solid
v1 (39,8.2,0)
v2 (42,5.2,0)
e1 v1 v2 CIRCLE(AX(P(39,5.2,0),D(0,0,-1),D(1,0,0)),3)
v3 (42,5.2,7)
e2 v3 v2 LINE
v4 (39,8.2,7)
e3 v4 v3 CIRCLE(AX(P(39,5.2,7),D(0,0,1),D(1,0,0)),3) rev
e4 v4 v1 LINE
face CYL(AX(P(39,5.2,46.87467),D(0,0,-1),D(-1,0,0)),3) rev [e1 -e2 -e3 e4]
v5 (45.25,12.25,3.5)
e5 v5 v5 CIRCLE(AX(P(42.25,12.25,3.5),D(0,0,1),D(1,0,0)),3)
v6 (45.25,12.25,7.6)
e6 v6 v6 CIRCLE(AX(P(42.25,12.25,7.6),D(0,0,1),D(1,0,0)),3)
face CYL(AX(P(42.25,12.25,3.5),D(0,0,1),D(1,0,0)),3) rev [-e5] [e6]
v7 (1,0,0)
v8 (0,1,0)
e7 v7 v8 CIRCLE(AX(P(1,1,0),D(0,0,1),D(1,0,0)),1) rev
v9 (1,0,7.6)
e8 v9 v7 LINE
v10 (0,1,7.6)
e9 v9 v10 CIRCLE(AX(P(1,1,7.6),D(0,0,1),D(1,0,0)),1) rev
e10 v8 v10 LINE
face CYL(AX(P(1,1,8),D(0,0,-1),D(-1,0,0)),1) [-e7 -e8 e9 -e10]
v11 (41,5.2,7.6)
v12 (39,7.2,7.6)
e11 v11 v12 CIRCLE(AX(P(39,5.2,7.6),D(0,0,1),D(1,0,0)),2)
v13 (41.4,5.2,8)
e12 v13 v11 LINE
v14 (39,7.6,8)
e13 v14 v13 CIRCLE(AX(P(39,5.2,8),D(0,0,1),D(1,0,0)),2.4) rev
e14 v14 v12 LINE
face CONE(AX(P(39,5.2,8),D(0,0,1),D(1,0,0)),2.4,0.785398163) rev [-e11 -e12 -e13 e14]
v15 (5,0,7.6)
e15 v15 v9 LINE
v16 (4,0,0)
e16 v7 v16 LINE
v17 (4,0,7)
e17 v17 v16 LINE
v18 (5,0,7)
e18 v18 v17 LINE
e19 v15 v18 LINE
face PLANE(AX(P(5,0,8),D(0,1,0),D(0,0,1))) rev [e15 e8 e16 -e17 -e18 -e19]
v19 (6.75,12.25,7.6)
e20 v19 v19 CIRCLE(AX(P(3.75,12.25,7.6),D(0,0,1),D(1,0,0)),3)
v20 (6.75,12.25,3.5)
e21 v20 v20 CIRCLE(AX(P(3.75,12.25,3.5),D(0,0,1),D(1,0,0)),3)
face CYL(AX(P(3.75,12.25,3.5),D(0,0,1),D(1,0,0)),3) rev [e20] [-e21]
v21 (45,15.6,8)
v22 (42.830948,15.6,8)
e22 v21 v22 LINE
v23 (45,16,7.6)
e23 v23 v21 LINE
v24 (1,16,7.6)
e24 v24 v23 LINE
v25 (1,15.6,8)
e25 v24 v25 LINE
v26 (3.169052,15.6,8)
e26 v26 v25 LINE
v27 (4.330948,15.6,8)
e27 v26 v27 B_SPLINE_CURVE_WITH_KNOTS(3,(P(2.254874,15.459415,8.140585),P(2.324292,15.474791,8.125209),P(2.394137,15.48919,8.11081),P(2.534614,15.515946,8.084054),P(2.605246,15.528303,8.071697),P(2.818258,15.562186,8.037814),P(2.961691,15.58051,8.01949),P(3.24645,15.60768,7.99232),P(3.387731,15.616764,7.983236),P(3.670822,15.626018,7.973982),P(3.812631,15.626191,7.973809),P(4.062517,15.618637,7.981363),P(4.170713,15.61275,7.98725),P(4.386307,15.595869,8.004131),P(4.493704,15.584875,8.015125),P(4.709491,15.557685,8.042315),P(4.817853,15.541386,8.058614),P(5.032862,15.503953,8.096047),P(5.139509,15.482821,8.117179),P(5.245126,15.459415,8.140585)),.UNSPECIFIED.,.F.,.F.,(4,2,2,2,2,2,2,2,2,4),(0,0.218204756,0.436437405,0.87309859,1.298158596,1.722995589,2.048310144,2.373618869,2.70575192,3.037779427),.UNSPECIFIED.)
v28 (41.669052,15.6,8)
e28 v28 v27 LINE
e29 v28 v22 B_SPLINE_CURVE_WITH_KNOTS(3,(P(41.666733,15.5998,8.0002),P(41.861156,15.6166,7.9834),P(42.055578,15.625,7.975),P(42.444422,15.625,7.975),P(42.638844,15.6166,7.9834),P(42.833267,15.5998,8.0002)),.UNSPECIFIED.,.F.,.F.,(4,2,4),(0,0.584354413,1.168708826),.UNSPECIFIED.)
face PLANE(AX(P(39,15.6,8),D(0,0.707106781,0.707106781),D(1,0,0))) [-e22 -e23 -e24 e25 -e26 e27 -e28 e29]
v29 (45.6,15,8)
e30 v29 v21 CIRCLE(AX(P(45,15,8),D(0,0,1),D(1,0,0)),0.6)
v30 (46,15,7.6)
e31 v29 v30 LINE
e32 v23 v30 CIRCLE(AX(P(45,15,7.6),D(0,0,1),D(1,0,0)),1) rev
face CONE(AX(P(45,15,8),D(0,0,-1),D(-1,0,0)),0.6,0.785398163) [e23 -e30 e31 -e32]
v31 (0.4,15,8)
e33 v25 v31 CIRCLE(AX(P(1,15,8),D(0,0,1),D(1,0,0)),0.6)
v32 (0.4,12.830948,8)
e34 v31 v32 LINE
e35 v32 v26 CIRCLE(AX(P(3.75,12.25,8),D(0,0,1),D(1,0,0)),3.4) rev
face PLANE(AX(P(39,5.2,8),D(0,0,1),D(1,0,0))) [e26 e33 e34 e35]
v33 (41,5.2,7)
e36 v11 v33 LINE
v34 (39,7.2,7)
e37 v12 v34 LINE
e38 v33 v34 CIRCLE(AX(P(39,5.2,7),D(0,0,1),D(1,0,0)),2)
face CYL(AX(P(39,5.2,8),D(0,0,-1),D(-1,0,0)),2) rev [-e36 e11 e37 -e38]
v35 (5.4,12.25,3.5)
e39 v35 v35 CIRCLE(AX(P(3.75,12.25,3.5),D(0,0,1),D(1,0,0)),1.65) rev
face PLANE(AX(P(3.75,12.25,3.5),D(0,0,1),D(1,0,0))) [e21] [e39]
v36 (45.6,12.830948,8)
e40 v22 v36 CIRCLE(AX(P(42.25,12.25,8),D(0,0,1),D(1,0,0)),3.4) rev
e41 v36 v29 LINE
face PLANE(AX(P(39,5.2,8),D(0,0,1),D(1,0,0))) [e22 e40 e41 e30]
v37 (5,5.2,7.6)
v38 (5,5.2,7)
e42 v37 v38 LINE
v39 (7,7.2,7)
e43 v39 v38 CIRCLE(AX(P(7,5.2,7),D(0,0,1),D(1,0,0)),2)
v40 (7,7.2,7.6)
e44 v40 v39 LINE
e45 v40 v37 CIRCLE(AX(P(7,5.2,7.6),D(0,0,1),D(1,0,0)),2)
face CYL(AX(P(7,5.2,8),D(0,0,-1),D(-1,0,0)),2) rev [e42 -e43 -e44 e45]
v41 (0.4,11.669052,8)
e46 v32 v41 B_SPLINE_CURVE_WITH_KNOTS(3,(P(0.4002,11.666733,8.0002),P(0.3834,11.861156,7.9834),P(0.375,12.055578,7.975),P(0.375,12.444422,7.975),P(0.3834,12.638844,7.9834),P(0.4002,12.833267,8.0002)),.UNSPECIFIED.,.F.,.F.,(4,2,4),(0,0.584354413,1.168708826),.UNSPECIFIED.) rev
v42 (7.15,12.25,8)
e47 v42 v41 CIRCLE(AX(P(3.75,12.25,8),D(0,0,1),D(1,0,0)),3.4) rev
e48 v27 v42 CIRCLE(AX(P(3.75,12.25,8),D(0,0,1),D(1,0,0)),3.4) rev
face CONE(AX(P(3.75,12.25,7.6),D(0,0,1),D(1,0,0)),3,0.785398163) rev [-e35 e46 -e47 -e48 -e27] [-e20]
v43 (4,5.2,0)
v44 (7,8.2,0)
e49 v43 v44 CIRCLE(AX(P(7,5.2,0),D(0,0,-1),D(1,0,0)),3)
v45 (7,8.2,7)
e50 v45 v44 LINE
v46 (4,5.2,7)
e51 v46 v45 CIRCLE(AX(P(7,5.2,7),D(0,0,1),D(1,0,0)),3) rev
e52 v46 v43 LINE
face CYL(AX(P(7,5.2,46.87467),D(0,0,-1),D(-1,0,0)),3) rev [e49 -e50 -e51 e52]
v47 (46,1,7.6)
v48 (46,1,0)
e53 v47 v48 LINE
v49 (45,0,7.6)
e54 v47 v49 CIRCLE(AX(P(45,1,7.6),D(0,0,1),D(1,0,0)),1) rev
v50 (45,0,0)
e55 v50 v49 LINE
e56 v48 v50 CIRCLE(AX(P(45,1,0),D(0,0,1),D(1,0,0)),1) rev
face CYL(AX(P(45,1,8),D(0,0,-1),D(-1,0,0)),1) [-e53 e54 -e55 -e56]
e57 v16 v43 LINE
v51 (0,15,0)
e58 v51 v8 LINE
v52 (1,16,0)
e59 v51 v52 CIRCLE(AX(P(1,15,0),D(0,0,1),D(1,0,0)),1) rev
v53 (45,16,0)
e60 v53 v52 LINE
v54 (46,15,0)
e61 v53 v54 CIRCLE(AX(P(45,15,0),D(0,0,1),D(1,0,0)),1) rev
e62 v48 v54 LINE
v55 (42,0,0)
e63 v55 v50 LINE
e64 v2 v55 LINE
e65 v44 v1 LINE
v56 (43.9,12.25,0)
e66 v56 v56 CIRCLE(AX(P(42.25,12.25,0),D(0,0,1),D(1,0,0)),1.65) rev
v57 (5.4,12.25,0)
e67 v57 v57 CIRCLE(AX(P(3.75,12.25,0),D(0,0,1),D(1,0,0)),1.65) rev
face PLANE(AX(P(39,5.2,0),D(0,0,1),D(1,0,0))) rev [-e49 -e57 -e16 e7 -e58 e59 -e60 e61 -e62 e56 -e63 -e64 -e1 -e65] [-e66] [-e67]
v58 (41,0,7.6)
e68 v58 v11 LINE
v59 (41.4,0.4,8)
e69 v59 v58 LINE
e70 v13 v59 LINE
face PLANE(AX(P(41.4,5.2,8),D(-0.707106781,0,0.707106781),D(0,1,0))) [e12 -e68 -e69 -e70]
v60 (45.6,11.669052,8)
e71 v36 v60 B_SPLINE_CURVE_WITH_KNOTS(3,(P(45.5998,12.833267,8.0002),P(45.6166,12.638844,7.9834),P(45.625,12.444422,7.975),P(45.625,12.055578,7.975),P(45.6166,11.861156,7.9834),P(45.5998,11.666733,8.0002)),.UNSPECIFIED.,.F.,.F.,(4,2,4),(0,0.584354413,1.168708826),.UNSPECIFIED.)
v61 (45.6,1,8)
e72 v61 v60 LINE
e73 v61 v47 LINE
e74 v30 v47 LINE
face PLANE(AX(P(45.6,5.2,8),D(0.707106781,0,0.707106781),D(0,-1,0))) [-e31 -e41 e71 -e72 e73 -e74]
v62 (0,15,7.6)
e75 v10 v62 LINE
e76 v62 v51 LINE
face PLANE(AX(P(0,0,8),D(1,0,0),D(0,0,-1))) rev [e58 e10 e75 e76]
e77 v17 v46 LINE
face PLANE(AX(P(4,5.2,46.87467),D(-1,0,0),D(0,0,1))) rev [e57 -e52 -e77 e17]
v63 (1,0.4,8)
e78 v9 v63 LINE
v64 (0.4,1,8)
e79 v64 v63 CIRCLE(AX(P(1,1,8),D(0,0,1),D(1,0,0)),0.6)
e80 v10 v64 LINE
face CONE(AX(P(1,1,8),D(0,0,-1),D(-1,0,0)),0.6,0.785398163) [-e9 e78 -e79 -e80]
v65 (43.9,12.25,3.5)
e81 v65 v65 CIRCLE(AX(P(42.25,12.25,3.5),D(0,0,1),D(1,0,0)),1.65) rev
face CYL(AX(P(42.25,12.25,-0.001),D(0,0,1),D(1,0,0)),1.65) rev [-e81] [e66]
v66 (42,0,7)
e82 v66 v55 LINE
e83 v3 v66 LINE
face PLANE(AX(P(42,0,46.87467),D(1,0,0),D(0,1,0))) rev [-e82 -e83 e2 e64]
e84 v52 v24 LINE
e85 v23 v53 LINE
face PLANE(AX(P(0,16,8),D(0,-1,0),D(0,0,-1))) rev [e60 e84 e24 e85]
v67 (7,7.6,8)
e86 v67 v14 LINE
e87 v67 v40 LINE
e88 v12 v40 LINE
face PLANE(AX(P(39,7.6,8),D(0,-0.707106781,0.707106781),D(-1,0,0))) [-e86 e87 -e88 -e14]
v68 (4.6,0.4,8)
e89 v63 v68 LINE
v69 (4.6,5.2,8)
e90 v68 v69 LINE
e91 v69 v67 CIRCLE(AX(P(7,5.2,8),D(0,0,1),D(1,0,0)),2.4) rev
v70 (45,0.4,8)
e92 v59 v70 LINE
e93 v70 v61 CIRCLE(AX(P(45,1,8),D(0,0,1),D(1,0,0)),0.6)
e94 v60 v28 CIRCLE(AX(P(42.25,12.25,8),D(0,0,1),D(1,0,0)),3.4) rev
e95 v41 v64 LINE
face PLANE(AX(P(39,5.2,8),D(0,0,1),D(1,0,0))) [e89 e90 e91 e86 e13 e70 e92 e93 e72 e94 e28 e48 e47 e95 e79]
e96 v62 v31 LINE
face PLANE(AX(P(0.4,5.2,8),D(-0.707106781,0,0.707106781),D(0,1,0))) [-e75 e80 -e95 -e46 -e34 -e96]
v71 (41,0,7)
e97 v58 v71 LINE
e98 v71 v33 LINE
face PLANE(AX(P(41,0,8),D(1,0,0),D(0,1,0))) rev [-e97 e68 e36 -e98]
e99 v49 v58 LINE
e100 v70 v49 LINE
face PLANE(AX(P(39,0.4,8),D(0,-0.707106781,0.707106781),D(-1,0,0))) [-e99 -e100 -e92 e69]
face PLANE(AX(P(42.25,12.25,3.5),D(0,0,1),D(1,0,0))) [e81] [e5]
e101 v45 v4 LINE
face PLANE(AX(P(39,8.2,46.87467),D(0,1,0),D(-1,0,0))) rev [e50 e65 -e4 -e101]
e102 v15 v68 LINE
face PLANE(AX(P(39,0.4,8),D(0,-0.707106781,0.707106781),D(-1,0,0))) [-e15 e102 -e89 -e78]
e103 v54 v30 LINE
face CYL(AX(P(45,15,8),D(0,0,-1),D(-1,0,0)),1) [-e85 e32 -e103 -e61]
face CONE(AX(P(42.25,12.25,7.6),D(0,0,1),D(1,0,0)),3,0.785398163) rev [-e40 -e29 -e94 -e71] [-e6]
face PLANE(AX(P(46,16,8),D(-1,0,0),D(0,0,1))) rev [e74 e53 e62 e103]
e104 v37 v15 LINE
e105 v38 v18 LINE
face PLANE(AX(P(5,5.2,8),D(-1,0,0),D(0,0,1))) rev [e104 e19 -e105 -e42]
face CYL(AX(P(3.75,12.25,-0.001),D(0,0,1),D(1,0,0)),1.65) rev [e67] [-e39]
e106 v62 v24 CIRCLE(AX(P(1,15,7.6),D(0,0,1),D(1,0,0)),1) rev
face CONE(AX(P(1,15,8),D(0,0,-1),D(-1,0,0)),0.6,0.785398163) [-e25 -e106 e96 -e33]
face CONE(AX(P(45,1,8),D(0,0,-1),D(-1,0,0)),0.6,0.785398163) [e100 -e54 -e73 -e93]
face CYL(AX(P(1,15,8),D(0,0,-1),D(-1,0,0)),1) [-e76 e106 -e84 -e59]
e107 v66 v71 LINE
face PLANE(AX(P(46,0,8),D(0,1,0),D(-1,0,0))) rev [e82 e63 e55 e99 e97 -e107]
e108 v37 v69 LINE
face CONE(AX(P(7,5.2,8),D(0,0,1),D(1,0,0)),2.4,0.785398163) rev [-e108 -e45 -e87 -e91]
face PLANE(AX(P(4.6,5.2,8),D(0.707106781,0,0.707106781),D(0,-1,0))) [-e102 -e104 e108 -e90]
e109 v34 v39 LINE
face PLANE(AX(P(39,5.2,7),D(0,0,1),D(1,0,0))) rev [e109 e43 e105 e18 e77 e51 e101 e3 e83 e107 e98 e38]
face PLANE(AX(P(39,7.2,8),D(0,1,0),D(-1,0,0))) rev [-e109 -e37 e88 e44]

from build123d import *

# Parameters (mm, degrees)
BOSS_EXTRUDE1_DEPTH = 8
CUT_EXTRUDE1_REACH  = 51.356
SKETCH2_R           = 1.65
SKETCH3_R           = 3
CUT_EXTRUDE2_DEPTH  = 4.5
CUT_EXTRUDE3_DEPTH  = 7
FILLET1_R           = 1
CHAMFER2_SIZE       = 0.4


with BuildPart() as part:
    # Sketch1 → Boss-Extrude1 (new body)
    with BuildSketch(Plane.XY):
        with BuildLine():
            Line((0, 0), (0, 16))
            Line((0, 16), (46, 16))
            Line((46, 16), (46, 0))
            Line((46, 0), (41, 0))
            Line((41, 0), (41, 5.2))
            ThreePointArc((41, 5.2), (40.414213562, 6.614213562), (39, 7.2))
            Line((39, 7.2), (7, 7.2))
            ThreePointArc((7, 7.2), (5.585786438, 6.614213562), (5, 5.2))
            Line((5, 5.2), (5, 0))
            Line((5, 0), (0, 0))
        make_face()
    extrude(amount=BOSS_EXTRUDE1_DEPTH)

    # Sketch2 → Cut-Extrude1 (cut, up to next)
    with BuildSketch(Plane.XY.offset(8), mode=Mode.PRIVATE) as cut_extrude1_sk1:
        with Locations((3.75, 12.25)):
            Circle(SKETCH2_R)
    cut_extrude1_tool1 = extrude(cut_extrude1_sk1.sketch, amount=-CUT_EXTRUDE1_REACH, mode=Mode.PRIVATE) & part.part
    # Sketch2 → Cut-Extrude1 (cut, up to next)
    with BuildSketch(Plane.XY.offset(8), mode=Mode.PRIVATE) as cut_extrude1_sk2:
        with Locations((42.25, 12.25)):
            Circle(SKETCH2_R)
    cut_extrude1_tool2 = extrude(cut_extrude1_sk2.sketch, amount=-CUT_EXTRUDE1_REACH, mode=Mode.PRIVATE) & part.part
    add(cut_extrude1_tool1.solids().sort_by_distance((3.75, 12.25, 8))[0], mode=Mode.SUBTRACT)
    add(cut_extrude1_tool2.solids().sort_by_distance((42.25, 12.25, 8))[0], mode=Mode.SUBTRACT)

    # Sketch3 → Cut-Extrude2 (cut)
    with BuildSketch(Plane.XY.offset(8)):
        with Locations((3.75, 12.25)):
            Circle(SKETCH3_R)
        with Locations((42.25, 12.25)):
            Circle(SKETCH3_R)
    extrude(amount=-CUT_EXTRUDE2_DEPTH, mode=Mode.SUBTRACT)

    # Sketch4 → Cut-Extrude3 (cut)
    with BuildSketch(Plane(origin=(0, 0, 0), x_dir=(-1, 0, 0), z_dir=(0, 0, -1))):
        with BuildLine():
            Line((-4, 0), (-5, 0))
            Line((-5, 0), (-5, 5.2))
            ThreePointArc((-5, 5.2), (-5.585786438, 6.614213562), (-7, 7.2))
            Line((-7, 7.2), (-39, 7.2))
            ThreePointArc((-39, 7.2), (-40.414213592, 6.614213592), (-41, 5.2))
            Line((-41, 5.2), (-41, 0))
            Line((-41, 0), (-42, 0))
            Line((-42, 0), (-42, 5.200000101))
            ThreePointArc((-42, 5.200000101), (-41.121320373, 7.321320373), (-39.000000101, 8.2))
            Line((-39.000000101, 8.2), (-7, 8.2))
            ThreePointArc((-7, 8.2), (-4.878679656, 7.321320344), (-4, 5.2))
            Line((-4, 5.2), (-4, 0))
        make_face()
    extrude(amount=-CUT_EXTRUDE3_DEPTH, mode=Mode.SUBTRACT)

    # Fillet1
    fillet1_edges = [part.edges().sort_by_distance(p)[0] for p in [
        (0, 0, 4),
        (0, 16, 4),
        (46, 16, 4),
        (46, 0, 4),
    ]]
    fillet(fillet1_edges, radius=FILLET1_R)

    # Chamfer2
    # the kernel refuses this chamfer: 0.4 mm, written as the material it takes off along each edge
    with BuildSketch(Plane(origin=(6.028673195, 0, 8), x_dir=(0, 0.9996219169112966, 0.027495876610587326), z_dir=(-1, 0, 0)), Plane(origin=(45, 0, 8), x_dir=(0, 0.9996219169112966, 0.027495876610587378), z_dir=(-1, 0, 0))) as chamfer2_piece_1:
        Polygon((CHAMFER2_SIZE * 0.999621916911, CHAMFER2_SIZE * 0.0274958766106), (-CHAMFER2_SIZE * 0.0274958766106, CHAMFER2_SIZE * 0.999621916911), (0, 0), align=None)
    extrude(amount=5.028673195, mode=Mode.SUBTRACT)
    with BuildSketch(Plane(origin=(46, 15, 8), x_dir=(-0.9996219169112966, 0, 0.027495876610587656), z_dir=(0, -1, 0))) as chamfer2_piece_2:
        Polygon((CHAMFER2_SIZE * 0.999621916911, CHAMFER2_SIZE * 0.0274958766106), (-CHAMFER2_SIZE * 0.0274958766106, CHAMFER2_SIZE * 0.999621916911), (0, 0), align=None)
    extrude(amount=14, mode=Mode.SUBTRACT)
    with BuildSketch(Plane(origin=(1, 1, 8), x_dir=(-1, 0, 0), z_dir=(0, 1, 0))) as chamfer2_piece_3:
        Polygon((1, -CHAMFER2_SIZE), (1 - CHAMFER2_SIZE, 0), (1, 0), align=None)
    revolve(axis=Axis((1, 1, 8), (0, 0, 1)), revolution_arc=90, mode=Mode.SUBTRACT)
    with BuildSketch(Plane(origin=(45, 1, 8), x_dir=(1, 0, 0), z_dir=(0, 1, 0))) as chamfer2_piece_4:
        Polygon((1 - CHAMFER2_SIZE, 0), (1, CHAMFER2_SIZE), (1, 0), align=None)
    revolve(axis=Axis((45, 1, 8), (0, 0, -1)), revolution_arc=90, mode=Mode.SUBTRACT)
    with BuildSketch(Plane(origin=(45, 15, 8), x_dir=(0, 1, 0), z_dir=(-1, 0, 0))) as chamfer2_piece_5:
        Polygon((1 - CHAMFER2_SIZE, 0), (1, CHAMFER2_SIZE), (1, 0), align=None)
    revolve(axis=Axis((45, 15, 8), (0, 0, -1)), revolution_arc=90, mode=Mode.SUBTRACT)
    with BuildSketch(Plane(origin=(1, 15, 8), x_dir=(-1, 0, 0), z_dir=(0, -1, 0))) as chamfer2_piece_6:
        Polygon((1, CHAMFER2_SIZE), (1 - CHAMFER2_SIZE, 0), (1, 0), align=None)
    revolve(axis=Axis((1, 15, 8), (0, 0, -1)), revolution_arc=90, mode=Mode.SUBTRACT)
    with BuildSketch(Plane(origin=(7, 5.2, 8), x_dir=(0, 1, 0), z_dir=(1, 0, 0))) as chamfer2_piece_7:
        Polygon((2 + CHAMFER2_SIZE, 0), (2, -CHAMFER2_SIZE), (2, 0), align=None)
    revolve(axis=Axis((7, 5.2, 8), (0, 0, 1)), revolution_arc=90, mode=Mode.SUBTRACT)
    with BuildSketch(Plane(origin=(39, 7.2, 8), x_dir=(0, 0.9996219169112966, 0.027495876610587302), z_dir=(-1, 0, 0))) as chamfer2_piece_8:
        Polygon((CHAMFER2_SIZE * 0.999621916911, CHAMFER2_SIZE * 0.0274958766106), (-CHAMFER2_SIZE * 0.0274958766106, CHAMFER2_SIZE * 0.999621916911), (0, 0), align=None)
    extrude(amount=32, mode=Mode.SUBTRACT)
    with BuildSketch(Plane(origin=(39, 5.2, 8), x_dir=(1, 0, 0), z_dir=(0, -1, 0))) as chamfer2_piece_9:
        Polygon((2 + CHAMFER2_SIZE, 0), (2, -CHAMFER2_SIZE), (2, 0), align=None)
    revolve(axis=Axis((39, 5.2, 8), (0, 0, 1)), revolution_arc=90, mode=Mode.SUBTRACT)
    with BuildSketch(Plane(origin=(41, -1.028673195, 8), x_dir=(0.9996219169112966, 1.3659117145536696e-15, 0.027495876610587656), z_dir=(0, 1, 0)), Plane(origin=(5, 5.2, 8), x_dir=(-0.9996219169112966, 0, 0.027495876610587243), z_dir=(0, -1, 0))) as chamfer2_piece_10:
        Polygon((CHAMFER2_SIZE * 0.999621916911, CHAMFER2_SIZE * 0.0274958766106), (-CHAMFER2_SIZE * 0.0274958766106, CHAMFER2_SIZE * 0.999621916911), (0, 0), align=None)
    extrude(amount=6.228673195, mode=Mode.SUBTRACT)
    with BuildSketch(Plane(origin=(3.75, 12.25, 8), x_dir=(1, 0, 0), z_dir=(0, -1, 0))) as chamfer2_piece_11:
        Polygon((3 + CHAMFER2_SIZE, 0), (3, -CHAMFER2_SIZE), (3, 0), align=None)
    revolve(axis=Axis((3.75, 12.25, 8), (0, 0, 1)), mode=Mode.SUBTRACT)
    with BuildSketch(Plane(origin=(42.25, 12.25, 8), x_dir=(1, 0, 0), z_dir=(0, -1, 0))) as chamfer2_piece_12:
        Polygon((3 + CHAMFER2_SIZE, 0), (3, -CHAMFER2_SIZE), (3, 0), align=None)
    revolve(axis=Axis((42.25, 12.25, 8), (0, 0, 1)), mode=Mode.SUBTRACT)
    with BuildSketch(Plane(origin=(0, 1, 8), x_dir=(-0.027495876610586258, 0, -0.9996219169112966), z_dir=(0, 1, 0))) as chamfer2_piece_13:
        Polygon((CHAMFER2_SIZE * 0.999621916911, -CHAMFER2_SIZE * 0.0274958766106), (-CHAMFER2_SIZE * 0.0274958766106, -CHAMFER2_SIZE * 0.999621916911), (0, 0), align=None)
    extrude(amount=14, mode=Mode.SUBTRACT)
    with BuildSketch(Plane(origin=(1, 16, 8), x_dir=(0, -0.9996219169112966, 0.027495876610587302), z_dir=(1, 0, 0))) as chamfer2_piece_14:
        Polygon((CHAMFER2_SIZE * 0.999621916911, CHAMFER2_SIZE * 0.0274958766106), (-CHAMFER2_SIZE * 0.0274958766106, CHAMFER2_SIZE * 0.999621916911), (0, 0), align=None)
    extrude(amount=44, mode=Mode.SUBTRACT)


solid = part.part
